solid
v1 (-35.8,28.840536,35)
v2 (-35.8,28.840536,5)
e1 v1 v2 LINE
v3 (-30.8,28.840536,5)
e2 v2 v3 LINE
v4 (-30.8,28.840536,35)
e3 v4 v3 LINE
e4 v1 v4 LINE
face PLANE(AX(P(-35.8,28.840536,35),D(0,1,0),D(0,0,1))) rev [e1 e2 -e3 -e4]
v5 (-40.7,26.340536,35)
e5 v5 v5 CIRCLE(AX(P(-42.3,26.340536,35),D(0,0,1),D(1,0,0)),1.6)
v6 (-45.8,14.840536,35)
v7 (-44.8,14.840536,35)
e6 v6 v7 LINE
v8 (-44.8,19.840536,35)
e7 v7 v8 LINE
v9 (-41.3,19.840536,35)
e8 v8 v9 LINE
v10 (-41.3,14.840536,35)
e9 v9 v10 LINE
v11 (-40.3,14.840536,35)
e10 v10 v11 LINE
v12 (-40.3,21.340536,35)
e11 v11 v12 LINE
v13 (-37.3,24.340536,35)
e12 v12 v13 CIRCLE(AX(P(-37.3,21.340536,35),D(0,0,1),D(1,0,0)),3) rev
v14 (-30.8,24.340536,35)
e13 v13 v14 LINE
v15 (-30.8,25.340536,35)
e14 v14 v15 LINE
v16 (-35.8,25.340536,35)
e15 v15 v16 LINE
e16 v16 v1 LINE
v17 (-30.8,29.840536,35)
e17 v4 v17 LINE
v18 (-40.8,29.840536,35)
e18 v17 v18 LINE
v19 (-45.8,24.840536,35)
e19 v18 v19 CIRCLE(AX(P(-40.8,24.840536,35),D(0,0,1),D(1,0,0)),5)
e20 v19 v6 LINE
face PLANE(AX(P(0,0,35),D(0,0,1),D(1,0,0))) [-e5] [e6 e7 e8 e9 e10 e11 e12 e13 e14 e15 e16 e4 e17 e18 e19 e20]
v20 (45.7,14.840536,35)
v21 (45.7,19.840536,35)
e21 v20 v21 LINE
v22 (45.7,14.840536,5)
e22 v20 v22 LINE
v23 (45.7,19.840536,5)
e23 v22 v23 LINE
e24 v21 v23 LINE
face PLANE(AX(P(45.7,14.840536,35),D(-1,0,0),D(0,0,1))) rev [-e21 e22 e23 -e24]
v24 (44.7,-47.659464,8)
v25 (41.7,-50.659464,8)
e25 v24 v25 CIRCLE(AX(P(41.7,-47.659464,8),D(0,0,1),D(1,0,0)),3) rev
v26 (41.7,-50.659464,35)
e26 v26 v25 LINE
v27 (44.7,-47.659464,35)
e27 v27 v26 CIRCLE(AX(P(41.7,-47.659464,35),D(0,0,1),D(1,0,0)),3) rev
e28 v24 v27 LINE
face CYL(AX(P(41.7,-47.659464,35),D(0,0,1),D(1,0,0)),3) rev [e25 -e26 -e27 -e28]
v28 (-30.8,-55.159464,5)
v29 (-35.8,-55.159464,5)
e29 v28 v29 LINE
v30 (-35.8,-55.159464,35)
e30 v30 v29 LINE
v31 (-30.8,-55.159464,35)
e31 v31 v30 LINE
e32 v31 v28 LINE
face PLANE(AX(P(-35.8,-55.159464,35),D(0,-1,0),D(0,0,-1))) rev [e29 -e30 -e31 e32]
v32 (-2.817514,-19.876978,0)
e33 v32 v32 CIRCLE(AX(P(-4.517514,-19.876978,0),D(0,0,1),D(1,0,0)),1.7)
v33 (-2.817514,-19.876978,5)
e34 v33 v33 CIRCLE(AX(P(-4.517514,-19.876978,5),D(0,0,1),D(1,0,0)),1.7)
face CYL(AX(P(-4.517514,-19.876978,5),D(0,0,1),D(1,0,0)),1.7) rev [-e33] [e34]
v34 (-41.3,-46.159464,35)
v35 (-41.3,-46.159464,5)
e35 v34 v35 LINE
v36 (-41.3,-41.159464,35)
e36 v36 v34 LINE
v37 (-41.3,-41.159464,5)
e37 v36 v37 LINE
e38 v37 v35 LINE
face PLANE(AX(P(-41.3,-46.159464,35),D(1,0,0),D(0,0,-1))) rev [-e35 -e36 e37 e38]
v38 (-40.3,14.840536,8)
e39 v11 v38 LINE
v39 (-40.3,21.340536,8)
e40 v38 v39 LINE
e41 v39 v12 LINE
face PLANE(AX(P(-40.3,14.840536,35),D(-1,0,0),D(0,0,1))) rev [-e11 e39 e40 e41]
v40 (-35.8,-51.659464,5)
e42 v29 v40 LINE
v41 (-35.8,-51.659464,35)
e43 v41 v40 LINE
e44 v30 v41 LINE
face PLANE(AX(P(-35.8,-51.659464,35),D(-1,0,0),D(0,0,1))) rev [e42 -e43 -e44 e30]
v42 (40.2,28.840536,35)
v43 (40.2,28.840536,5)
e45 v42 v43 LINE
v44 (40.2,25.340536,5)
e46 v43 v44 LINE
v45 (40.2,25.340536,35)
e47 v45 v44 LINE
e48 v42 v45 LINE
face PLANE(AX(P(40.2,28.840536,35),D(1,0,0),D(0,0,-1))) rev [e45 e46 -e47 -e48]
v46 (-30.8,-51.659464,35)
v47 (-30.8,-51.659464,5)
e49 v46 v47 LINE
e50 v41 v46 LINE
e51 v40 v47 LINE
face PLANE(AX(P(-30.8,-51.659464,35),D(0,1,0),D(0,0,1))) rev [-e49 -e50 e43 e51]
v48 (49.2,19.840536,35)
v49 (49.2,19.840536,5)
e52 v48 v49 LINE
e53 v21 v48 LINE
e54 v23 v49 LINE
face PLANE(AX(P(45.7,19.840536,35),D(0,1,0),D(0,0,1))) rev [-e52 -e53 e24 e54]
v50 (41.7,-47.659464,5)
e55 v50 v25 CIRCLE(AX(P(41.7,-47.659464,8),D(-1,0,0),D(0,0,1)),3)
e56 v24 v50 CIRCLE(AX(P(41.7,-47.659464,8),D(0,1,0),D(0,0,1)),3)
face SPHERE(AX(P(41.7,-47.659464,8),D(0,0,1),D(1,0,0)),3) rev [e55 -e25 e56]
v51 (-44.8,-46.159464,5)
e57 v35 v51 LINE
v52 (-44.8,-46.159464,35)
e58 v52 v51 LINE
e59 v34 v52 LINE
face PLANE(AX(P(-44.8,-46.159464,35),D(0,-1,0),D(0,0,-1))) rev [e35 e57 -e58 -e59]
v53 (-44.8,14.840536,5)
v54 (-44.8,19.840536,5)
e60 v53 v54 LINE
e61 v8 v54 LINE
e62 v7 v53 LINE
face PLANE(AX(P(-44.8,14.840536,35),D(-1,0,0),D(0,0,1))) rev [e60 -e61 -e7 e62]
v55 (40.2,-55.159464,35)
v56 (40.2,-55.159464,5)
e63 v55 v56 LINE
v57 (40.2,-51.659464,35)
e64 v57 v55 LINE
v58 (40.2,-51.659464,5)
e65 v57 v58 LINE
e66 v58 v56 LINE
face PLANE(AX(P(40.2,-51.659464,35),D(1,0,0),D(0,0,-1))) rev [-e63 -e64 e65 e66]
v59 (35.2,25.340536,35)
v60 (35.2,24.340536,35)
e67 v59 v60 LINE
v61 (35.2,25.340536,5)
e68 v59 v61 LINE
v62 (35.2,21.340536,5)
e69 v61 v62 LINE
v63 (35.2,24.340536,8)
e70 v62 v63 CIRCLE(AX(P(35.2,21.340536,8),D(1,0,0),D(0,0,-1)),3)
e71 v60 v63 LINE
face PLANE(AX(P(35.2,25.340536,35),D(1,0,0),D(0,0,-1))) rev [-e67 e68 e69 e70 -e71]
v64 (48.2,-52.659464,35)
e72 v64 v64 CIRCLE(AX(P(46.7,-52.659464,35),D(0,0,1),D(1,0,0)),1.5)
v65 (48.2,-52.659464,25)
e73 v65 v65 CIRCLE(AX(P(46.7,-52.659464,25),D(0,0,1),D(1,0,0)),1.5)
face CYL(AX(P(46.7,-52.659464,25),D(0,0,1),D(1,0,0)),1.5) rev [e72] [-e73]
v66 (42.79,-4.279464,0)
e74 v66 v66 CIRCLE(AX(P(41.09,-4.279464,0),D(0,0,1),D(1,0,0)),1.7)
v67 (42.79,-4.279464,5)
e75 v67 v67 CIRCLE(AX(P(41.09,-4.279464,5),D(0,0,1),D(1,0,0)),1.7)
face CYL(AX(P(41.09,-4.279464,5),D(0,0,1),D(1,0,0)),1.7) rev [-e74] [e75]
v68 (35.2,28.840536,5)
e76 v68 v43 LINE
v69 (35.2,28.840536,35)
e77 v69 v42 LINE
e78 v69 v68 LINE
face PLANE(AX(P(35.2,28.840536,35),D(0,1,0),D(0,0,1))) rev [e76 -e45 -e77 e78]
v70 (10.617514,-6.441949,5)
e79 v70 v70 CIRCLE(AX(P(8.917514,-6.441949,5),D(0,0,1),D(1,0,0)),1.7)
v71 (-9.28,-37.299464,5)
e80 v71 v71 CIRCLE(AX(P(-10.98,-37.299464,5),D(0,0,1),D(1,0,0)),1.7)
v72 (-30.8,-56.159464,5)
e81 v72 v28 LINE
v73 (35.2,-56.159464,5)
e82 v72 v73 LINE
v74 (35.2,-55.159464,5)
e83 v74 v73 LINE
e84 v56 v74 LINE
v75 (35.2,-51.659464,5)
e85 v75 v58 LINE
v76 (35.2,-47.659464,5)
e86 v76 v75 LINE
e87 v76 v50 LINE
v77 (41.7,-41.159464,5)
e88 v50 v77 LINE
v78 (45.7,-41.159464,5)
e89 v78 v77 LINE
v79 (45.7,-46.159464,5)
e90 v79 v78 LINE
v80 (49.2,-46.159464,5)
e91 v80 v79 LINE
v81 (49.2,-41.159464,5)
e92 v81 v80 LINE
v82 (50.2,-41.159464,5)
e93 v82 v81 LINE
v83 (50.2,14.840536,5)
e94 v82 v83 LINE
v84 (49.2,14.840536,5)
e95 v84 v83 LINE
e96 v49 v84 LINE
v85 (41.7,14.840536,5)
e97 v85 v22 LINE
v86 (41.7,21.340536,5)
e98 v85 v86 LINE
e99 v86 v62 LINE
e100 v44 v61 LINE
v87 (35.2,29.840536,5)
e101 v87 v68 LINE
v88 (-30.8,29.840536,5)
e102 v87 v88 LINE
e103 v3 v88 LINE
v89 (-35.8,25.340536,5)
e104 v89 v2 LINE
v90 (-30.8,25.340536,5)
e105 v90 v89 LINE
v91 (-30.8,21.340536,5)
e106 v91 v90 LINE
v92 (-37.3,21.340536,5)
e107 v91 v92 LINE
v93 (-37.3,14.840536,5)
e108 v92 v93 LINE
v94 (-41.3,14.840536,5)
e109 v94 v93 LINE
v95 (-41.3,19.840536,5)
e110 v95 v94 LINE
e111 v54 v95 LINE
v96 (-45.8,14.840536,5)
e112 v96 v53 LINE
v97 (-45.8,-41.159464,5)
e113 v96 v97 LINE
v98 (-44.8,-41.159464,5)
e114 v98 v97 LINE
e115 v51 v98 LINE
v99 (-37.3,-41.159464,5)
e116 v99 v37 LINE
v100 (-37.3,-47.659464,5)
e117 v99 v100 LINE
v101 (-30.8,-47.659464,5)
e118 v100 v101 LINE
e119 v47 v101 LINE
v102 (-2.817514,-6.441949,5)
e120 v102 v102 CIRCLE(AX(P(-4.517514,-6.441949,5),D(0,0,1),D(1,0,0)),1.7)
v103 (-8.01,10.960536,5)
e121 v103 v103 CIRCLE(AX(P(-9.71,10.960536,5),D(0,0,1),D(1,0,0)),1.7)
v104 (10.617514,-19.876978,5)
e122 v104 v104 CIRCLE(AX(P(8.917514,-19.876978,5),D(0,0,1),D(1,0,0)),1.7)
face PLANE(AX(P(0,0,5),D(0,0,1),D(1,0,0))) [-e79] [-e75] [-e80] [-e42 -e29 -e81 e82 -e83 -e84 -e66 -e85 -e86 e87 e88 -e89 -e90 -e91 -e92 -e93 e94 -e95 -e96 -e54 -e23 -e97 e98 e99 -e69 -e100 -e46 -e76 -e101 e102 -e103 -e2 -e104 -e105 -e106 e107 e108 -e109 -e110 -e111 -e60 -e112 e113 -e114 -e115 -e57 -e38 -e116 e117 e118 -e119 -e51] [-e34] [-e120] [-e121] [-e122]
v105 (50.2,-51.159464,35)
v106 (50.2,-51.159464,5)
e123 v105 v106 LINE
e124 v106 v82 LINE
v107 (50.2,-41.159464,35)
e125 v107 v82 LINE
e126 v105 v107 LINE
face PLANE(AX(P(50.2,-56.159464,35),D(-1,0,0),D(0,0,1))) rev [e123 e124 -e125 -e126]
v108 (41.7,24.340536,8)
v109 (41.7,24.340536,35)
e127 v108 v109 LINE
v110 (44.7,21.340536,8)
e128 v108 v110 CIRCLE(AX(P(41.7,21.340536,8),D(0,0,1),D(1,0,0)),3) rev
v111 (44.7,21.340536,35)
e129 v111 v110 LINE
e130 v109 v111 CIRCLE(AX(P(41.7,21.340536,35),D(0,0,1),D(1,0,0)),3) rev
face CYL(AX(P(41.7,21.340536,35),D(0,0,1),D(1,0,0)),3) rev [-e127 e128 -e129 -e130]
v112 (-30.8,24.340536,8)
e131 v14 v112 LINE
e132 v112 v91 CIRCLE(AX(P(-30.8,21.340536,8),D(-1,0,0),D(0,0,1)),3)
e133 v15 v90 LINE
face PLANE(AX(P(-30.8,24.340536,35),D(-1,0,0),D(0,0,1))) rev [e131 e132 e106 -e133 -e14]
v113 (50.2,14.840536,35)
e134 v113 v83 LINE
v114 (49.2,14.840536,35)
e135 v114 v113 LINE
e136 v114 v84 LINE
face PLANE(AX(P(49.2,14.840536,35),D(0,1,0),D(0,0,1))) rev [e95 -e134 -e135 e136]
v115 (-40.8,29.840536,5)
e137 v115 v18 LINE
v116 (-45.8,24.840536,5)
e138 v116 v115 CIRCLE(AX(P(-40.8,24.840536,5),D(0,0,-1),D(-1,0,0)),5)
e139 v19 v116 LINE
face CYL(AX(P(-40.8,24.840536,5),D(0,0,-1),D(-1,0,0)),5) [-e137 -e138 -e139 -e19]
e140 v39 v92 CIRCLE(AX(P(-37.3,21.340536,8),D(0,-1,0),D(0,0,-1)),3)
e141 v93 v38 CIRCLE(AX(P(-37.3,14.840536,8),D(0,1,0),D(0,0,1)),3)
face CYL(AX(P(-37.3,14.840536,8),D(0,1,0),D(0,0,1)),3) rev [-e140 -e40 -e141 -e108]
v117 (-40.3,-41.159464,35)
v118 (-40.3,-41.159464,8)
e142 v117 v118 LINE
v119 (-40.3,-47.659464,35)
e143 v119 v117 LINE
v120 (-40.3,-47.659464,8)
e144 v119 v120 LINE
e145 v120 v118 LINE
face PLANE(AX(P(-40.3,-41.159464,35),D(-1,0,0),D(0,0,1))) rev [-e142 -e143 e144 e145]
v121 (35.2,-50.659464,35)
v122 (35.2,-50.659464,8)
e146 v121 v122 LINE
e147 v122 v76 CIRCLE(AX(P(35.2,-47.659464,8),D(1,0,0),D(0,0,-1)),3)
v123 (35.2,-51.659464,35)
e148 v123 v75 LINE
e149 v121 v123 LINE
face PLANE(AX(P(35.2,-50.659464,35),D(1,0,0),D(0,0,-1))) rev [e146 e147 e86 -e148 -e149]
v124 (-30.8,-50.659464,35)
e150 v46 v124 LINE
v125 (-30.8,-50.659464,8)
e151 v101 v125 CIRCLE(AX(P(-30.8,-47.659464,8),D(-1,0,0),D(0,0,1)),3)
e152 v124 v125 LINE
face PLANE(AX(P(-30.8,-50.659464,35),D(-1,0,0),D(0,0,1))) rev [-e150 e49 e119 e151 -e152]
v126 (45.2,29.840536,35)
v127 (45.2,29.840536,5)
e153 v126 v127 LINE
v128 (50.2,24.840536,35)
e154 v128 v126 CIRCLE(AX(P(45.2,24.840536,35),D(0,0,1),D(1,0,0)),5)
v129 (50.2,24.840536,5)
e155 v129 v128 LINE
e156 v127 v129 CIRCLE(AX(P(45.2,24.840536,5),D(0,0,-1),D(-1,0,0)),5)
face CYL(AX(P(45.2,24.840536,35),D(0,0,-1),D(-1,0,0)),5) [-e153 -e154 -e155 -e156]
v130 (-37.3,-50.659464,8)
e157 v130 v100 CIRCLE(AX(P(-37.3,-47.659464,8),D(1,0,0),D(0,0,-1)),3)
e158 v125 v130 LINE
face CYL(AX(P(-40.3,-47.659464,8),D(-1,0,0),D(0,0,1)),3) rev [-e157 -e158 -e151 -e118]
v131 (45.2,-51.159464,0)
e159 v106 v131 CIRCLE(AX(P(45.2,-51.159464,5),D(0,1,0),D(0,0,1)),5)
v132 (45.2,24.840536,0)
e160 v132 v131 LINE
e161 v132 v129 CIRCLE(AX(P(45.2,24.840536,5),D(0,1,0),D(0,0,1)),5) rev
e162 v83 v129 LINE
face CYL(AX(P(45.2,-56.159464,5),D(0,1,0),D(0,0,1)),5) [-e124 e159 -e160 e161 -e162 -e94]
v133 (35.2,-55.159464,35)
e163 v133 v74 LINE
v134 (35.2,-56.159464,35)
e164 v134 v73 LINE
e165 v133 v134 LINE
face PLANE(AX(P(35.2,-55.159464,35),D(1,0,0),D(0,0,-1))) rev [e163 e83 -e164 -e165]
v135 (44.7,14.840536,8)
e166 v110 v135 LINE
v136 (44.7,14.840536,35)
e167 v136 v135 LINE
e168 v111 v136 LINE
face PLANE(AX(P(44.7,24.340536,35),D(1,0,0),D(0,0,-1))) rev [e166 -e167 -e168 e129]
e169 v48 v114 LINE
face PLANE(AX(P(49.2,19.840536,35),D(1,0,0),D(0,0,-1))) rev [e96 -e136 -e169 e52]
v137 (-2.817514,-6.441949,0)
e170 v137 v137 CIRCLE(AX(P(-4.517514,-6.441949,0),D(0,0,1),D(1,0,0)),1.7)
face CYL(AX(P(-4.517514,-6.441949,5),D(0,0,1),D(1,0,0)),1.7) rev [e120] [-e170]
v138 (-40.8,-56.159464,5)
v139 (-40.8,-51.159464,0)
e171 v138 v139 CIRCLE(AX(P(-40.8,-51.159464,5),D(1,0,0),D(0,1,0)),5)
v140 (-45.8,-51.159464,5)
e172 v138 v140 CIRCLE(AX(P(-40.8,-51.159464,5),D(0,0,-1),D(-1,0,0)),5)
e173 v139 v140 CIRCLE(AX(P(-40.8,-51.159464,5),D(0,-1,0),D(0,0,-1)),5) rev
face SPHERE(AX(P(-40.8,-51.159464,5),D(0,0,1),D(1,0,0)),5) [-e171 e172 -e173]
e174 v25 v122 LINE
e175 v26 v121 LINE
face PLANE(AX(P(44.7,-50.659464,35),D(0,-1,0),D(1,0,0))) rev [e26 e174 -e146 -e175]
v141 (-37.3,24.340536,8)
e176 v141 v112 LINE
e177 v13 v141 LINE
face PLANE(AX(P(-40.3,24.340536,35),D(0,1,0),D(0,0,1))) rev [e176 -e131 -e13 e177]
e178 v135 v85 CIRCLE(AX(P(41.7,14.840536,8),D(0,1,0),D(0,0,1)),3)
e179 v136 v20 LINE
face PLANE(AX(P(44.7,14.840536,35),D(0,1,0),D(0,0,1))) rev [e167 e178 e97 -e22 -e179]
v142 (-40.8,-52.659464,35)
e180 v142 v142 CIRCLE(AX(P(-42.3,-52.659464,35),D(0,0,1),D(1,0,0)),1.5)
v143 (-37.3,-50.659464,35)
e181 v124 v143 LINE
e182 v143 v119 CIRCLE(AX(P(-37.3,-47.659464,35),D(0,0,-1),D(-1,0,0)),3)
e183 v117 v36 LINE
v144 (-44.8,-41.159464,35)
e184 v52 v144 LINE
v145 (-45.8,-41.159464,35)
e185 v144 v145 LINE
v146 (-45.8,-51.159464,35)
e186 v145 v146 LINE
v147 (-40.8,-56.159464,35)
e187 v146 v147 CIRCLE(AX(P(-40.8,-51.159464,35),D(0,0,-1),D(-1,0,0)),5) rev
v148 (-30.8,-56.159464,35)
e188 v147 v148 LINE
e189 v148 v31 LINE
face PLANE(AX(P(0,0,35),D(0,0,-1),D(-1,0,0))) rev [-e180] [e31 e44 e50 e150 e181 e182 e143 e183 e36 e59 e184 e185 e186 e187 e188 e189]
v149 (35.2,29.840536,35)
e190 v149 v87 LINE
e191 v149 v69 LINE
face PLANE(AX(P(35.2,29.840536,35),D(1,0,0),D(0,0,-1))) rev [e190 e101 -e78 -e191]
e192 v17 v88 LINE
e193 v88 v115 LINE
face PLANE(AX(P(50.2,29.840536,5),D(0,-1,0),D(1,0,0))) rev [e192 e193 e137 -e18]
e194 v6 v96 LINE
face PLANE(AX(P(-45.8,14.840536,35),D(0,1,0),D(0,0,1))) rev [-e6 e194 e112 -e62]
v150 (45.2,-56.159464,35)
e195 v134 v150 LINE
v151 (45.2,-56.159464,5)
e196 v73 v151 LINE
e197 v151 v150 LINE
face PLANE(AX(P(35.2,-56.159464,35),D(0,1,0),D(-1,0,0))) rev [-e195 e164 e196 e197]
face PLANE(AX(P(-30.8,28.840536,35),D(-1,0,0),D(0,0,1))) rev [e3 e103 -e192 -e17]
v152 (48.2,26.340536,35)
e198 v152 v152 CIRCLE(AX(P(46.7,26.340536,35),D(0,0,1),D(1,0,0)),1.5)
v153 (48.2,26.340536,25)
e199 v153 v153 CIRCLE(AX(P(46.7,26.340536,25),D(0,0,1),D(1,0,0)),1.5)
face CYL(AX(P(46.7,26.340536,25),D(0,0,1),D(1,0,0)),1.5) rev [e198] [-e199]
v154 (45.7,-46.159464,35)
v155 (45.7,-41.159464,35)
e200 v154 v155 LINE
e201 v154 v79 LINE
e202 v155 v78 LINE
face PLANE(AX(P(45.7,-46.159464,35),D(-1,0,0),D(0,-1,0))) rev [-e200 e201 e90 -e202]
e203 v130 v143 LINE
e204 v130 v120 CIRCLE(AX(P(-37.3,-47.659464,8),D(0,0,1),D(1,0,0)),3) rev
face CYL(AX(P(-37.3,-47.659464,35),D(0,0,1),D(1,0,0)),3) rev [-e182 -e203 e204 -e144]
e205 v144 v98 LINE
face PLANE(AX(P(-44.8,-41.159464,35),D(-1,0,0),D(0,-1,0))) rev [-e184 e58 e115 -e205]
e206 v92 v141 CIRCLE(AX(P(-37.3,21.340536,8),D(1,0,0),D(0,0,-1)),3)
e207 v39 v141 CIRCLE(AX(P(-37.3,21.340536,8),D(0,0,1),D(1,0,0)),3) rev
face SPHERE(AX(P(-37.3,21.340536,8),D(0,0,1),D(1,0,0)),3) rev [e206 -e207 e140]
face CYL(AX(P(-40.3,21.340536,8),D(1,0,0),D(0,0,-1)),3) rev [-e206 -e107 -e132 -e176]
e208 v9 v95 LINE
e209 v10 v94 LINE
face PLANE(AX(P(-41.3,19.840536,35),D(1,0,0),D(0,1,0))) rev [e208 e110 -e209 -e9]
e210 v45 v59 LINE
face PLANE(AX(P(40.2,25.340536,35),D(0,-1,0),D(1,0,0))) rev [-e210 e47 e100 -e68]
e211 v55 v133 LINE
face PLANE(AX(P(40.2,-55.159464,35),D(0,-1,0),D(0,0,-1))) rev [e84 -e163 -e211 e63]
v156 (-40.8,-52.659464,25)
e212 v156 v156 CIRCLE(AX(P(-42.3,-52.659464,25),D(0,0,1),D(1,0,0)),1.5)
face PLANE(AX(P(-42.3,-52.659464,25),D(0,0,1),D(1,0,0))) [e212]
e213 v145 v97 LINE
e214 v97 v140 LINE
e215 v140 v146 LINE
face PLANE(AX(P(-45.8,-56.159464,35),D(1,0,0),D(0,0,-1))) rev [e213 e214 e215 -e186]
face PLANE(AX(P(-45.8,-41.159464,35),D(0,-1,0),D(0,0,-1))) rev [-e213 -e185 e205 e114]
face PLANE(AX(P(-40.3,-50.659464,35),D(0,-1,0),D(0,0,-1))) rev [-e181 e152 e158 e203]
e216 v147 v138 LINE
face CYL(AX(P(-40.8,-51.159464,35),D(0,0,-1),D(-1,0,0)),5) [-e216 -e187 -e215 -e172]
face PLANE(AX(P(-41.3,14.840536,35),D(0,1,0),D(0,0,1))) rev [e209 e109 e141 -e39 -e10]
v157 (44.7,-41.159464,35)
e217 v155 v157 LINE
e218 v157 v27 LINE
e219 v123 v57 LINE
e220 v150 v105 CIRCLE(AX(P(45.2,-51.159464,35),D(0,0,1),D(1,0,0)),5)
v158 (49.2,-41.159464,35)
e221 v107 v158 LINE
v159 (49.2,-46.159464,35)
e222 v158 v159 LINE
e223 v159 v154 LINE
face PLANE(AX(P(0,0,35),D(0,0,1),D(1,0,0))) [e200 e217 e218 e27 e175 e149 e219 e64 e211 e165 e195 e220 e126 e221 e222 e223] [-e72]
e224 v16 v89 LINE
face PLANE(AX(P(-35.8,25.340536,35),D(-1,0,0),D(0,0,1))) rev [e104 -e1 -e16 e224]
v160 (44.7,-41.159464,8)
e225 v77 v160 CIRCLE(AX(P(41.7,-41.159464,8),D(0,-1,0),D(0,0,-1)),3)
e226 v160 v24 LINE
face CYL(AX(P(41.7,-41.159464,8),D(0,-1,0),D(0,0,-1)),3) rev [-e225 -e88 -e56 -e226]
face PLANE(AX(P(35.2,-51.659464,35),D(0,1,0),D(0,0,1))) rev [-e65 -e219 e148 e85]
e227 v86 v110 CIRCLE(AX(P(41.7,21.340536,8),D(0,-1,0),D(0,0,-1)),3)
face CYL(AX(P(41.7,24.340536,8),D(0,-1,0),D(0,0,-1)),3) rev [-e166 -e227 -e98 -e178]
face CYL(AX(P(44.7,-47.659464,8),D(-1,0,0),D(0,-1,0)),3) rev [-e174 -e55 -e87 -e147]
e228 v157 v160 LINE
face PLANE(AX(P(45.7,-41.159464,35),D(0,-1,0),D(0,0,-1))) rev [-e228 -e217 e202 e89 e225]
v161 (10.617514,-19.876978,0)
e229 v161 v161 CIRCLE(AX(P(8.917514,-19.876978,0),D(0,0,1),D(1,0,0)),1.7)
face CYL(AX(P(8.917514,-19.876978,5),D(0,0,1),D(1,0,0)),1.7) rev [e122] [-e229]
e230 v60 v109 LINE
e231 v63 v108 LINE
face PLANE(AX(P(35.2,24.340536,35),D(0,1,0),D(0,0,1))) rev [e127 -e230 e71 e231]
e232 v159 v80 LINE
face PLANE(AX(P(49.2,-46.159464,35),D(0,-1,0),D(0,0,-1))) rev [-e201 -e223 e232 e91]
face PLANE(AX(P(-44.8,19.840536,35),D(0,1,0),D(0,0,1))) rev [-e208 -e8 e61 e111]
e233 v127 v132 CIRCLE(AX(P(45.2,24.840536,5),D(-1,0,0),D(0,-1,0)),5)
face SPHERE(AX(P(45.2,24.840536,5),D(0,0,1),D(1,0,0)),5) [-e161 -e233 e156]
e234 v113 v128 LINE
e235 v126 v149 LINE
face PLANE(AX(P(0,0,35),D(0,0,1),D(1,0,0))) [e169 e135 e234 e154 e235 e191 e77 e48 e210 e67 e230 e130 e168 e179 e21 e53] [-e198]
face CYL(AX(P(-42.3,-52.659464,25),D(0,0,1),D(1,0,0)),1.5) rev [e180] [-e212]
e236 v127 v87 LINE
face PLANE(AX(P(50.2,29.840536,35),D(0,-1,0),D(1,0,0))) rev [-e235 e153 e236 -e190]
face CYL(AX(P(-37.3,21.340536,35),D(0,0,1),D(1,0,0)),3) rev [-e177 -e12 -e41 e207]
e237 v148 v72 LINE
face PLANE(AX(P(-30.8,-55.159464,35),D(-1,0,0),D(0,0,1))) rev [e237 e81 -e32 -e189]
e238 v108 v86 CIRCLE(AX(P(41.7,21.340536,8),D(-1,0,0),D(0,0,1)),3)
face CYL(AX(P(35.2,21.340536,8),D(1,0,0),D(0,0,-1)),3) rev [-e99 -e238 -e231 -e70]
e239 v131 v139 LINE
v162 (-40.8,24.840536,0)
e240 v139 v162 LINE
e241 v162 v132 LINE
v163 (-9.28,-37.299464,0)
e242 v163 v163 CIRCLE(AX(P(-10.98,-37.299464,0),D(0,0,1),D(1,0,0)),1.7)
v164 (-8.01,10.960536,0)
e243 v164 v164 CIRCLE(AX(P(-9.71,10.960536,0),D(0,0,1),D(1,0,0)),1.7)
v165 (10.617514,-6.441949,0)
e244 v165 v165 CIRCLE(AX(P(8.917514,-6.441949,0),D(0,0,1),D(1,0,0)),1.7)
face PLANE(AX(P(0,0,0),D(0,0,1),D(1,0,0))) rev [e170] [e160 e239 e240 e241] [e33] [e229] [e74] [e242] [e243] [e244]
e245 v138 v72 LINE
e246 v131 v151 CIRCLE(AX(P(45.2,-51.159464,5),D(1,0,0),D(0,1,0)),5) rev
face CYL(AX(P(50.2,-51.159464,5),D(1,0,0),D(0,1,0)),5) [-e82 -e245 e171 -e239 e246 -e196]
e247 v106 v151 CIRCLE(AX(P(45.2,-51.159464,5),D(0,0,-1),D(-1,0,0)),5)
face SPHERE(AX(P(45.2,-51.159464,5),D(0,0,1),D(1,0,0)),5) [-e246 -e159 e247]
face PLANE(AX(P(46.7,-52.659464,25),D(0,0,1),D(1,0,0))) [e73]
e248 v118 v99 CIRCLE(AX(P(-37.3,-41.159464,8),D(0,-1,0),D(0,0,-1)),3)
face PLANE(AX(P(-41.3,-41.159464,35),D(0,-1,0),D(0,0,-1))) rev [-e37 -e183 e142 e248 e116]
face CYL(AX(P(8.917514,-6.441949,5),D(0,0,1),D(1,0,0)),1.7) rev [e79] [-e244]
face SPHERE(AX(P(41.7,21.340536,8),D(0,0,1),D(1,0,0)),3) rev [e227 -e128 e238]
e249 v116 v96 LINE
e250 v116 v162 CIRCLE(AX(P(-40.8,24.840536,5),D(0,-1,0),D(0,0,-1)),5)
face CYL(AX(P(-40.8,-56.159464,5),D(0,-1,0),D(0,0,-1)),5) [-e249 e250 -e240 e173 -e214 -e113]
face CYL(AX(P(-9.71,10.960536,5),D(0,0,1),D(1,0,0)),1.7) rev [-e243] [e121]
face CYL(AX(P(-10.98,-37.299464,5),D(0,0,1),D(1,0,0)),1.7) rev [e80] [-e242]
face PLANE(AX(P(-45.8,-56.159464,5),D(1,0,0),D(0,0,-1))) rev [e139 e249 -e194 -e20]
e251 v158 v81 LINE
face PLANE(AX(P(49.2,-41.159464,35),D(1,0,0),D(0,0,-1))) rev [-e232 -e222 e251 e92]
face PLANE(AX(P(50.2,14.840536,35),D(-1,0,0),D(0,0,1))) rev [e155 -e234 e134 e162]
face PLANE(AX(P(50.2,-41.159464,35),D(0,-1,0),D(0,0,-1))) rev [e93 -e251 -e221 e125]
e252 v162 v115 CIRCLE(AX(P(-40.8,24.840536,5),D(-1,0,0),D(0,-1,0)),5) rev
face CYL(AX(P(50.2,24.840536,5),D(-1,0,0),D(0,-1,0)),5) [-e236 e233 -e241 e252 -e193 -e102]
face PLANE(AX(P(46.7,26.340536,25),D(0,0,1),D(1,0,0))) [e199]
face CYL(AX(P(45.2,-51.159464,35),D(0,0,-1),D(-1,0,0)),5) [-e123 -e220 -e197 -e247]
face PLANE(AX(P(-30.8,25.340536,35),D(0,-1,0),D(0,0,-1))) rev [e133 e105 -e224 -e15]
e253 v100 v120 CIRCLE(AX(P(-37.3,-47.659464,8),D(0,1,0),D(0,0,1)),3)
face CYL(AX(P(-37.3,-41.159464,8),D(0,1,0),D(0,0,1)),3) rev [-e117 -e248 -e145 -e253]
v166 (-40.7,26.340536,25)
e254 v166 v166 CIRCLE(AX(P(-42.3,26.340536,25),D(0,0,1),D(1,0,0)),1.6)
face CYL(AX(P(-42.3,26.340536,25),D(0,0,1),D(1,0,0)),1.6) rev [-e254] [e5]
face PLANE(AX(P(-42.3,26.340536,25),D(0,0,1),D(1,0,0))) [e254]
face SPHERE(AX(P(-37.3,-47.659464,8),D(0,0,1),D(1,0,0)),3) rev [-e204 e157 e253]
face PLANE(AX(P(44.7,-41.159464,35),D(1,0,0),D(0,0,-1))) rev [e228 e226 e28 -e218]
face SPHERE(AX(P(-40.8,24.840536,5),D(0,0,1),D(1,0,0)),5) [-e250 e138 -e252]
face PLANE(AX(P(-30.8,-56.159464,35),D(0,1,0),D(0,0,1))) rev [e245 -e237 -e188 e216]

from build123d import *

# Parameters (mm, degrees)
ESQUISSE1_W             = 96
ESQUISSE1_H             = 86
BOSS_EXTRU_1_DEPTH      = 5
BOSS_EXTRU_4_DEPTH      = 30
CONG_2_R                = 5
ESQUISSE4_R             = 1.6
ENL_V_MAT_EXTRU_1_DEPTH = 10
BOSS_EXTRU_17_DEPTH     = 30
ESQUISSE22_R            = 1.5
ENL_V_MAT_EXTRU_5_DEPTH = 10
BOSS_EXTRU_14_DEPTH     = 20
BOSS_EXTRU_15_DEPTH     = 30
ESQUISSE17_R            = 1.5
ENL_V_MAT_EXTRU_3_DEPTH = 10
BOSS_EXTRU_16_DEPTH     = 30
ESQUISSE19_R            = 1.5
ENL_V_MAT_EXTRU_4_DEPTH = 10
CONG_6_R                = 5
CONG_14_R               = 3
TROUM3_D                = 3.4


# Some blends are built 0.0001 mm under size
with BuildPart() as part:
    # Esquisse1 → Boss.-Extru.1 (new body)
    with BuildSketch(Plane.XY):
        with Locations((2.2, -13.159463773)):
            Rectangle(ESQUISSE1_W, ESQUISSE1_H)
    extrude(amount=BOSS_EXTRU_1_DEPTH)

    # Esquisse2 → Boss.-Extru.4 (add)
    with BuildSketch(Plane.XY.offset(5)):
        Polygon((-45.8, 29.840536227), (-45.8, 14.840536227), (-44.8, 14.840536227), (-44.8, 19.840536227), (-41.3, 19.840536227), (-41.3, 14.840536227), (-40.3, 14.840536227), (-40.3, 24.340536227), (-30.8, 24.340536227), (-30.8, 25.340536227), (-35.8, 25.340536227), (-35.8, 28.840536227), (-30.8, 28.840536227), (-30.8, 29.840536227), align=None)
    extrude(amount=BOSS_EXTRU_4_DEPTH)

    # Congé2
    cong_2_edges = [part.edges().sort_by_distance(p)[0] for p in [
        (-45.8, -13.159463773, 0),
        (2.2, -56.159463773, 0),
        (50.2, -13.159463773, 0),
        (2.2, 29.840536227, 0),
    ]]
    fillet(cong_2_edges, radius=CONG_2_R - 0.0001)  # a hair under: the kernel refuses the full size

    # Esquisse4 → Enlèv. mat.-Extru.1 (cut)
    with BuildSketch(Plane.XY.offset(35)):
        with Locations((-42.3, 26.340536227)):
            Circle(ESQUISSE4_R)
    extrude(amount=-ENL_V_MAT_EXTRU_1_DEPTH, mode=Mode.SUBTRACT)

    # Esquisse21 → Boss.-Extru.17 (add)
    with BuildSketch(Plane.XY.offset(5)):
        Polygon((-45.8, -56.159463773), (-45.8, -41.159463773), (-44.8, -41.159463773), (-44.8, -46.159463773), (-41.3, -46.159463773), (-41.3, -41.159463773), (-40.3, -41.159463773), (-40.3, -50.659463773), (-30.8, -50.659463773), (-30.8, -51.659463773), (-35.8, -51.659463773), (-35.8, -55.159463773), (-30.8, -55.159463773), (-30.8, -56.159463773), align=None)
    extrude(amount=BOSS_EXTRU_17_DEPTH)

    # Esquisse22 → Enlèv. mat.-Extru.5 (cut)
    with BuildSketch(Plane.XY.offset(35)):
        with Locations((-42.3, -52.659463773)):
            Circle(ESQUISSE22_R)
    extrude(amount=-ENL_V_MAT_EXTRU_5_DEPTH, mode=Mode.SUBTRACT)

    # Esquisse14 → Boss.-Extru.14 (add)
    with BuildSketch(Plane.XY.offset(5)):
        Polygon((-45.8, -56.159463773), (-45.8, -41.159463773), (-44.8, -41.159463773), (-44.8, -46.159463773), (-41.3, -46.159463773), (-41.3, -41.159463773), (-40.3, -41.159463773), (-40.3, -50.659463773), (-30.8, -50.659463773), (-30.8, -51.659463773), (-35.8, -51.659463773), (-35.8, -55.159463773), (-30.8, -55.159463773), (-30.8, -56.159463773), align=None)
    extrude(amount=BOSS_EXTRU_14_DEPTH)

    # Esquisse16 → Boss.-Extru.15 (add)
    with BuildSketch(Plane.XY.offset(5)):
        Polygon((50.2, 29.840536227), (35.2, 29.840536227), (35.2, 28.840536227), (40.2, 28.840536227), (40.2, 25.340536227), (35.2, 25.340536227), (35.2, 24.340536227), (44.7, 24.340536227), (44.7, 14.840536227), (45.7, 14.840536227), (45.7, 19.840536227), (49.2, 19.840536227), (49.2, 14.840536227), (50.2, 14.840536227), align=None)
    extrude(amount=BOSS_EXTRU_15_DEPTH)

    # Esquisse17 → Enlèv. mat.-Extru.3 (cut)
    with BuildSketch(Plane.XY.offset(35)):
        with Locations((46.7, 26.340536227)):
            Circle(ESQUISSE17_R)
    extrude(amount=-ENL_V_MAT_EXTRU_3_DEPTH, mode=Mode.SUBTRACT)

    # Esquisse18 → Boss.-Extru.16 (add)
    with BuildSketch(Plane.XY.offset(5)):
        Polygon((50.2, -56.159463773), (50.2, -41.159463773), (49.2, -41.159463773), (49.2, -46.159463773), (45.7, -46.159463773), (45.7, -41.159463773), (44.7, -41.159463773), (44.7, -50.659463773), (35.2, -50.659463773), (35.2, -51.659463773), (40.2, -51.659463773), (40.2, -55.159463773), (35.2, -55.159463773), (35.2, -56.159463773), align=None)
    extrude(amount=BOSS_EXTRU_16_DEPTH)

    # Esquisse19 → Enlèv. mat.-Extru.4 (cut)
    with BuildSketch(Plane.XY.offset(35)):
        with Locations((46.7, -52.659463773)):
            Circle(ESQUISSE19_R)
    extrude(amount=-ENL_V_MAT_EXTRU_4_DEPTH, mode=Mode.SUBTRACT)

    # Congé6
    # the kernel refuses this fillet: 5 mm, written as the material it takes off along each edge
    with BuildSketch(Plane(origin=(-40.8, 24.840536227, 0), x_dir=(-1, 0, 0), z_dir=(0, -1, 0))) as cong_6_piece_1:
        with BuildLine():
            CenterArc((0.0001, -4.9999), 4.9999, 0, 90)
            Line((5, -4.9999), (5, 0))
            Line((5, 0), (0.0001, 0))
        make_face()
    revolve(axis=Axis((-40.8, 24.840536227, 0), (0, 0, -1)), revolution_arc=90, mode=Mode.SUBTRACT)
    with BuildSketch(Plane(origin=(45.2, 24.840536227, 0), x_dir=(0, 1, 0), z_dir=(-1, 0, 0))) as cong_6_piece_2:
        with BuildLine():
            CenterArc((0.0001, -4.9999), 4.9999, 0, 90)
            Line((5, -4.9999), (5, 0))
            Line((5, 0), (0.0001, 0))
        make_face()
    revolve(axis=Axis((45.2, 24.840536227, 0), (0, 0, -1)), revolution_arc=90, mode=Mode.SUBTRACT)
    with BuildSketch(Plane(origin=(-40.8, -51.159463773, 0), x_dir=(0, -1, 0), z_dir=(1, 0, 0))) as cong_6_piece_3:
        with BuildLine():
            CenterArc((0.0001, -4.9999), 4.9999, 0, 90)
            Line((5, -4.9999), (5, 0))
            Line((5, 0), (0.0001, 0))
        make_face()
    revolve(axis=Axis((-40.8, -51.159463773, 0), (0, 0, -1)), revolution_arc=90, mode=Mode.SUBTRACT)
    with BuildSketch(Plane(origin=(45.2, -51.159463773, 0), x_dir=(1, 0, 0), z_dir=(0, 1, 0))) as cong_6_piece_4:
        with BuildLine():
            CenterArc((0.0001, -4.9999), 4.9999, 0, 90)
            Line((5, -4.9999), (5, 0))
            Line((5, 0), (0.0001, 0))
        make_face()
    revolve(axis=Axis((45.2, -51.159463773, 0), (0, 0, -1)), revolution_arc=90, mode=Mode.SUBTRACT)
    with BuildSketch(Plane(origin=(50.2, 29.840536227, 0), x_dir=(0, -1, 0), z_dir=(0, 0, 1)), Plane(origin=(50.2, -56.159463773, 0), x_dir=(-1, 0, 0), z_dir=(0, 0, 1)), Plane(origin=(-45.8, -56.159463773, 47.5), x_dir=(1, 0, 0), z_dir=(0, 0, -1)), Plane(origin=(-45.8, 29.840536227, 47.5), x_dir=(0, -1, 0), z_dir=(0, 0, -1))) as cong_6_piece_5:
        with BuildLine():
            CenterArc((CONG_6_R, -CONG_6_R), CONG_6_R, 90, 90)
            Line((0, -CONG_6_R), (0, 0))
            Line((0, 0), (CONG_6_R, 0))
        make_face()
    extrude(amount=47.5, mode=Mode.SUBTRACT)

    # Congé14
    cong_14_edges = [part.edges().sort_by_distance(p)[0] for p in [
        (39.95, 24.340536227, 5),
        (44.7, 19.590536227, 5),
        (44.7, 24.340536227, 20),
        (-40.3, 19.590536227, 5),
        (44.7, -45.909463773, 5),
        (-35.55, 24.340536227, 5),
        (39.95, -50.659463773, 5),
        (44.7, -50.659463773, 20),
        (-40.3, 24.340536227, 20),
        (-35.55, -50.659463773, 5),
        (-40.3, -45.909463773, 5),
        (-40.3, -50.659463773, 20),
    ]]
    fillet(cong_14_edges, radius=CONG_14_R)

    # TrouM3 (through all)
    with Locations(Plane.XY.offset(5)):
        with Locations((-9.71, 10.960536227), (41.09, -4.279463773), (-10.98, -37.299463773), (-4.517514421, -19.876978194), (-4.517514421, -6.441949352), (8.917514421, -6.441949352), (8.917514421, -19.876978194)):
            Hole(TROUM3_D / 2)


solid = part.part
